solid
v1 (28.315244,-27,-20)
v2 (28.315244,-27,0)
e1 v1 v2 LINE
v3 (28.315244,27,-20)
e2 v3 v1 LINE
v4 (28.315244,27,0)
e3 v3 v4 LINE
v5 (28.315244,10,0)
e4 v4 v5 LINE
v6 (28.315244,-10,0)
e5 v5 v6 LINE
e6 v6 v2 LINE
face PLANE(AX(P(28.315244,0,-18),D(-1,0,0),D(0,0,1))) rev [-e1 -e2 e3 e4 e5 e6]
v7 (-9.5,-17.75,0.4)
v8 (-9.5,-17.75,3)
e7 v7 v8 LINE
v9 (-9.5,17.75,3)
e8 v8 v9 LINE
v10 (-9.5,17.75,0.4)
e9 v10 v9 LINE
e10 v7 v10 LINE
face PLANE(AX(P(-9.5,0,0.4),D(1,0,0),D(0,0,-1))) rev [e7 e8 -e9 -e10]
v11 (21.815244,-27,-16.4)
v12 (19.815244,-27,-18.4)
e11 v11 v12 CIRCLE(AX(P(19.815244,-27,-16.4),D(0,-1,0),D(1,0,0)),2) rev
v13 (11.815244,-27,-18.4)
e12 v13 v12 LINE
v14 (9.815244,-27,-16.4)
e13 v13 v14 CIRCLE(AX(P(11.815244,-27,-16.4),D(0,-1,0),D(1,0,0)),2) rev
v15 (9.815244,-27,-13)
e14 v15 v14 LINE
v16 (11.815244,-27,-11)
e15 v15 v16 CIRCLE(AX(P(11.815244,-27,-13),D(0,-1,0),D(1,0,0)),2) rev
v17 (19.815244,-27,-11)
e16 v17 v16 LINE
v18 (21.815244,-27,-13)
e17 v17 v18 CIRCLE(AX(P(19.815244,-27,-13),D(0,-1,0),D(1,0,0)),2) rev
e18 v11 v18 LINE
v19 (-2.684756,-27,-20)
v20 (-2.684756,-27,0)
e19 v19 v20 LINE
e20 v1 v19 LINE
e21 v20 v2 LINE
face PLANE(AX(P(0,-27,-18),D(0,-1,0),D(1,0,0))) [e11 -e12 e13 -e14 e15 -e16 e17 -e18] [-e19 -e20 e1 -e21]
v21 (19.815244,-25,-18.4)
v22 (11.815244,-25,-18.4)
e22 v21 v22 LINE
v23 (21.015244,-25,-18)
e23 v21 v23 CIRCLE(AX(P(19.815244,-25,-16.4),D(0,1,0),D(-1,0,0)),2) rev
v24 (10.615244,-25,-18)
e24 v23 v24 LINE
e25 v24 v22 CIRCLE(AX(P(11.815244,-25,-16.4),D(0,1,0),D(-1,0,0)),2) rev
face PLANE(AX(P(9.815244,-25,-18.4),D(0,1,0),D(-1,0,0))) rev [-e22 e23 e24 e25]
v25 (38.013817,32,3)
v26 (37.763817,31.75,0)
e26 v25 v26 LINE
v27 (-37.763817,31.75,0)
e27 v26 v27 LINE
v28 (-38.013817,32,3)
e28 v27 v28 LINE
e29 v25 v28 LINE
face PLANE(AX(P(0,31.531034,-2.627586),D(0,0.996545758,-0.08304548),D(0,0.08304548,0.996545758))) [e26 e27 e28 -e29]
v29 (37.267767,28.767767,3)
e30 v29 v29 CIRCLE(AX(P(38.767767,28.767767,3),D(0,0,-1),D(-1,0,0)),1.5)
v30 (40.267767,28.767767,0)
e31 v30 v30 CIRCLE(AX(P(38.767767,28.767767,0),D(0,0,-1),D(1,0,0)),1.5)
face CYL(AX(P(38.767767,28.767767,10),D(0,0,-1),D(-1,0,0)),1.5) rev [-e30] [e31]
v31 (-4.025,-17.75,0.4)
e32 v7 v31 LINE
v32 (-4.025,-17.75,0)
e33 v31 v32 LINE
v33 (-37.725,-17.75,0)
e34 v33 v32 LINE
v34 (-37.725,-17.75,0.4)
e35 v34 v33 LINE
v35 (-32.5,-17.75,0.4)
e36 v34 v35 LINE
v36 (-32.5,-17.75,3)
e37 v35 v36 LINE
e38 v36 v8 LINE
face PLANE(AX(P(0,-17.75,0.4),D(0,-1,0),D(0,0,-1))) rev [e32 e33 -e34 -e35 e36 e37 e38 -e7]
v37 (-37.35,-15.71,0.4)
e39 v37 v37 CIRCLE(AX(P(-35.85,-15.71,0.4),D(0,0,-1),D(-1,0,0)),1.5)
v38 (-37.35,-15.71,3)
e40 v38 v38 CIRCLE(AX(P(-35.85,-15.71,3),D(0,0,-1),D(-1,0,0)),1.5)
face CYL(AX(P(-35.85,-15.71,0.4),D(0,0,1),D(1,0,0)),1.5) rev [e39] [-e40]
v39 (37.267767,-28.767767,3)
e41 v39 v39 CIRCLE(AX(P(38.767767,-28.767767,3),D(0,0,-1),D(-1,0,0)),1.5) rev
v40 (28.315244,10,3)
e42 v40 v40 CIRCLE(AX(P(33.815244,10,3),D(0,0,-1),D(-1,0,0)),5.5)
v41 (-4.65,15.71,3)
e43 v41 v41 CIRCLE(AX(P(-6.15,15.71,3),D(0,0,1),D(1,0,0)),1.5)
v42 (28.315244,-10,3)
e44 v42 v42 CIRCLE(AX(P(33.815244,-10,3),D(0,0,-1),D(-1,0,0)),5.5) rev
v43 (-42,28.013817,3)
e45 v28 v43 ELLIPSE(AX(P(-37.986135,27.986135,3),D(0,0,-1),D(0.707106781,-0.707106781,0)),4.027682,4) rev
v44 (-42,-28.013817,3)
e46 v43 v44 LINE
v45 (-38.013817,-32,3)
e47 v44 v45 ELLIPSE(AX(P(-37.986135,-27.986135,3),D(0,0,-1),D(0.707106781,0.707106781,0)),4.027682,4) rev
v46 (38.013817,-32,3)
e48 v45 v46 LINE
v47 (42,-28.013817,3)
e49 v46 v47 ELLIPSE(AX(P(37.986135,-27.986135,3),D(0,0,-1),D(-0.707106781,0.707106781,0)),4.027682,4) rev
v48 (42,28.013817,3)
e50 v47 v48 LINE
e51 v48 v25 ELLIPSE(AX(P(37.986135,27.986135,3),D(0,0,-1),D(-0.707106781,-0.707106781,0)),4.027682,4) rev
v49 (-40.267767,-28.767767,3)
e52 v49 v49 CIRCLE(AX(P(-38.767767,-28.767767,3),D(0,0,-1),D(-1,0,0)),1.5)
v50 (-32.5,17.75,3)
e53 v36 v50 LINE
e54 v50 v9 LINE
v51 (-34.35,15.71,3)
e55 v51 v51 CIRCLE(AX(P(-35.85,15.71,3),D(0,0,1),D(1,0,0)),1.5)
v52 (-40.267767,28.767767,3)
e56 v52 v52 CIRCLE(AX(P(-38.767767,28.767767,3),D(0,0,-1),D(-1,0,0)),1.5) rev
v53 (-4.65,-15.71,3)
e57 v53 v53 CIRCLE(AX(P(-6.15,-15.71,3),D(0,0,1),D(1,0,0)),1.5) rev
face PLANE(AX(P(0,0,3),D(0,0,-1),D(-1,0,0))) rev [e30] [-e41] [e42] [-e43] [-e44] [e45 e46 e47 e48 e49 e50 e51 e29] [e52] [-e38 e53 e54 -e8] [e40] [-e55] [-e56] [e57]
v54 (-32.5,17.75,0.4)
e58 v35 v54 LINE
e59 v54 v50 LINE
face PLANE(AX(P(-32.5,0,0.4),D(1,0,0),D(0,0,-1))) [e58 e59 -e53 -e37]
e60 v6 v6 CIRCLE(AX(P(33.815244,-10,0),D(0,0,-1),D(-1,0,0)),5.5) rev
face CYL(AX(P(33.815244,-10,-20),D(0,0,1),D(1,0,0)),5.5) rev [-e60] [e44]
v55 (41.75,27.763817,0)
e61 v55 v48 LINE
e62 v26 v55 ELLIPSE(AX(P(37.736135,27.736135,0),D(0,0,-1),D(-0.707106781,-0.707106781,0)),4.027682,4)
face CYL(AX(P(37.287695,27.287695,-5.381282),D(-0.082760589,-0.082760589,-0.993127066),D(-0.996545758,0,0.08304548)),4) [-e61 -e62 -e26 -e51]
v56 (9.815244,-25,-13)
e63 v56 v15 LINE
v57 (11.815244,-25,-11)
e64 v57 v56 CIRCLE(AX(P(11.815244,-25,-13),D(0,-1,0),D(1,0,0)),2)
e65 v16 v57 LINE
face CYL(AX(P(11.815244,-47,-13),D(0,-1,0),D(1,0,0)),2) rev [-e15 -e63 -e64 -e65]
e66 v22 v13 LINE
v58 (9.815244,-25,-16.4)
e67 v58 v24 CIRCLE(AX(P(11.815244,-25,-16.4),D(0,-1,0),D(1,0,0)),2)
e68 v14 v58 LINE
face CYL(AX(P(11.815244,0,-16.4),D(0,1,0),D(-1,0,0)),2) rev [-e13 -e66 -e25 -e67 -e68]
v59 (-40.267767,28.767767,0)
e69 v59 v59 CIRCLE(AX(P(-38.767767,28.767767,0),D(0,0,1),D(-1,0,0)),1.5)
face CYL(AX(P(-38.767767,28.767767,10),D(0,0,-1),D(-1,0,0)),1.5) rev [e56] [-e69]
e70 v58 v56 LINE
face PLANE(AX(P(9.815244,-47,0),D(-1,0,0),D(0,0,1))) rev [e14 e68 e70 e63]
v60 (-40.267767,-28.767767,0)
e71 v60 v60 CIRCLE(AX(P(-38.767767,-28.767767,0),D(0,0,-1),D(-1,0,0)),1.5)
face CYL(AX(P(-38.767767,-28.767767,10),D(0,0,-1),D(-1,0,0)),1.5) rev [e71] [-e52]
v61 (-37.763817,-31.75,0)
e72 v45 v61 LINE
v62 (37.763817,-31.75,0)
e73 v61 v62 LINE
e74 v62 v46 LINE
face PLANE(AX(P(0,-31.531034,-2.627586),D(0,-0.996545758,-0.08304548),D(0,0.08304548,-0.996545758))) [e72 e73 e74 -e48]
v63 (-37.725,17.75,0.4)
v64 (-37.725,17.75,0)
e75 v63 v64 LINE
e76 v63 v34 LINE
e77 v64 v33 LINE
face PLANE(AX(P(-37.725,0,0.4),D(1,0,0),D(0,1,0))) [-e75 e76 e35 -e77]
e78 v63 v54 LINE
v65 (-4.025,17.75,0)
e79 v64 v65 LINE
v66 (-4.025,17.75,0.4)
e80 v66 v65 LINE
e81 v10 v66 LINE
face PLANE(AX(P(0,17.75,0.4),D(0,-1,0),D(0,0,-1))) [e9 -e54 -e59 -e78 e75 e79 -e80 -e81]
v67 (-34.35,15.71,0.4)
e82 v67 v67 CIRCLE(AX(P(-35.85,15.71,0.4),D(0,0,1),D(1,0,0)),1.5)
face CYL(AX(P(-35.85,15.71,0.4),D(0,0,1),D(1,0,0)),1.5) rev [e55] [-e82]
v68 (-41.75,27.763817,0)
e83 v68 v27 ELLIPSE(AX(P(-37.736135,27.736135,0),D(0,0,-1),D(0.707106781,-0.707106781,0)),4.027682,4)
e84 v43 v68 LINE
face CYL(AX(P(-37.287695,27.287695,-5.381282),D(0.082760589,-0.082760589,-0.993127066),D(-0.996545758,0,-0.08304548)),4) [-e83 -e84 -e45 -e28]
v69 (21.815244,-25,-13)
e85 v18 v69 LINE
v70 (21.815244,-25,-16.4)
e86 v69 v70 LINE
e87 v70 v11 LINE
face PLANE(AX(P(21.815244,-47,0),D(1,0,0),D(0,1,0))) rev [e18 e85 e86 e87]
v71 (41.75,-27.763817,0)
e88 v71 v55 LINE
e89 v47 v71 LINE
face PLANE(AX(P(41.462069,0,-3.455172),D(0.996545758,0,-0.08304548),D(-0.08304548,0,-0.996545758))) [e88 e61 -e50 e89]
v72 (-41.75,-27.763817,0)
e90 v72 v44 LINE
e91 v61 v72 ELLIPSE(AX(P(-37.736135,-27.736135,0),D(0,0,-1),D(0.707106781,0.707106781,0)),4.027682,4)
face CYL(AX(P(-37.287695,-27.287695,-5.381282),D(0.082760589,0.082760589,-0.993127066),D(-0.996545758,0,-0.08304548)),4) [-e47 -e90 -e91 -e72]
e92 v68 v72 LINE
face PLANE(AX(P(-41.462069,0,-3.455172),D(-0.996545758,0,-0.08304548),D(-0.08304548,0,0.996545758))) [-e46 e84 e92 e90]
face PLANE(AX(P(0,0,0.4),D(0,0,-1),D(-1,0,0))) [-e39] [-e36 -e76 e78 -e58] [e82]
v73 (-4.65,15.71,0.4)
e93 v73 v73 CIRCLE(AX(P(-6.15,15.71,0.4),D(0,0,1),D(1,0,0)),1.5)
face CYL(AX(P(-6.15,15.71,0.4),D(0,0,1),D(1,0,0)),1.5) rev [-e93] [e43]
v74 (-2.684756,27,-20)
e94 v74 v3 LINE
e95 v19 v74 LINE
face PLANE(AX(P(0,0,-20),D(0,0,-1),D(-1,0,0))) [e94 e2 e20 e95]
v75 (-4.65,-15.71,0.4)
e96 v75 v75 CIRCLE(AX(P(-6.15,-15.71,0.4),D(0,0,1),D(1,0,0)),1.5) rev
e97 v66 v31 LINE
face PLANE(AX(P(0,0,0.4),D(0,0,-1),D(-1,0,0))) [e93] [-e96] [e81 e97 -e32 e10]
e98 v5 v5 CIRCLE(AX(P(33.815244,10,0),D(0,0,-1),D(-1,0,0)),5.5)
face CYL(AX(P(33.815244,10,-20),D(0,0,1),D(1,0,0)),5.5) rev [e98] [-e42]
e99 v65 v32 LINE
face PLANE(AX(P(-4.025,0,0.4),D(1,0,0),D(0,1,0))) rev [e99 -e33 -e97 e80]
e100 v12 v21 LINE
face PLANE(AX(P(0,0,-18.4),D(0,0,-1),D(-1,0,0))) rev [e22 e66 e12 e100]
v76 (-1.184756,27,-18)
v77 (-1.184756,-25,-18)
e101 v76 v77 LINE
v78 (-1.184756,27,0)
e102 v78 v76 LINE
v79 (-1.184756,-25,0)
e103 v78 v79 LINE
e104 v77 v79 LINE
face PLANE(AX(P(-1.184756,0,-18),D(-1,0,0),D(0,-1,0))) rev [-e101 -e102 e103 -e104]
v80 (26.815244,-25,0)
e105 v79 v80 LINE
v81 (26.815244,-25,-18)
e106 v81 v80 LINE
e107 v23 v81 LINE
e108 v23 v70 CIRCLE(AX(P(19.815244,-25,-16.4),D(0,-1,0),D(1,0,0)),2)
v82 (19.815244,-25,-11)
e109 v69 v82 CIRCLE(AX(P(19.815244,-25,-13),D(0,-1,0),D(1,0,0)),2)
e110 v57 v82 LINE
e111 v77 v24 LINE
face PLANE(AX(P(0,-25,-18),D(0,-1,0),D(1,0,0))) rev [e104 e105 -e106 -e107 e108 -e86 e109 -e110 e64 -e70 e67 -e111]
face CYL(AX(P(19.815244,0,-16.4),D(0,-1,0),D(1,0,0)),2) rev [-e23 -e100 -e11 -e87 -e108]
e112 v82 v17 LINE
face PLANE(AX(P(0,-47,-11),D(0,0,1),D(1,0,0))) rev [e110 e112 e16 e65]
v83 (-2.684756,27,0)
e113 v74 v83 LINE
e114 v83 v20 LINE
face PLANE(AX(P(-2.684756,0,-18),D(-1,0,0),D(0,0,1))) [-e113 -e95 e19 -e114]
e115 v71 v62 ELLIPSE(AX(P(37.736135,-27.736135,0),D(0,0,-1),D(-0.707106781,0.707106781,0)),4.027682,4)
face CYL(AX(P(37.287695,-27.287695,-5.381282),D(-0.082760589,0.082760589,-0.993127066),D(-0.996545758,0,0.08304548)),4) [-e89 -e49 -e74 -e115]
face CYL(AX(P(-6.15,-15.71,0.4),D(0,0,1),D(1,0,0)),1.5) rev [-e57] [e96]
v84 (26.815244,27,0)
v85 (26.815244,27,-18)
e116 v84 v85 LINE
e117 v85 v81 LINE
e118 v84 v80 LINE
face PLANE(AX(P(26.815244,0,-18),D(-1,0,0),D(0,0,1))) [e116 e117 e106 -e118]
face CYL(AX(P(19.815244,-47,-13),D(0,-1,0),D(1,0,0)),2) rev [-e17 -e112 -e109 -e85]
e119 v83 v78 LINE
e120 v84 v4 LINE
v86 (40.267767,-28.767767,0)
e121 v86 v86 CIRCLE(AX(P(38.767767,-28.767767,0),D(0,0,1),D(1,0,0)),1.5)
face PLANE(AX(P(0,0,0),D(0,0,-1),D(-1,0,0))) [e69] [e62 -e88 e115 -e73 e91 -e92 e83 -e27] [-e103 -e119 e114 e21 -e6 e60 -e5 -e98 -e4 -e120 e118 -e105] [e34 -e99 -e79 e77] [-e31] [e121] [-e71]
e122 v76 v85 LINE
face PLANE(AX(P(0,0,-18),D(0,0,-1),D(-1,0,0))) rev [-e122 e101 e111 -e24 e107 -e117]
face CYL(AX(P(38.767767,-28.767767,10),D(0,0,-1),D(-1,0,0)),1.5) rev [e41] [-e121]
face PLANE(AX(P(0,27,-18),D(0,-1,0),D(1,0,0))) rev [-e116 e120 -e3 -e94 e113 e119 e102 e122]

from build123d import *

# Parameters (mm, degrees)
SKETCH3_R               = 1.5
CUT_EXTRUDE1_DEPTH      = 10
MIRROR2_COPY_1_SKETCH_R = 1.5
MIRROR2_COPY_1_DEPTH    = 10
FILLET1_R               = 4
SKETCH4_W               = 23
SKETCH4_H               = 17.75
SKETCH4_R               = 1.5
CUT_EXTRUDE2_DEPTH      = 2.6
SKETCH5_W               = 33.7
SKETCH5_H               = 17.75
CUT_EXTRUDE3_DEPTH      = 0.4
BOSS_EXTRUDE1_DEPTH     = 18
SKETCH7_W               = 31
SKETCH7_H               = 54
BOSS_EXTRUDE2_DEPTH     = 2
SKETCH8_W               = 14
SKETCH8_H               = 18
CUT_EXTRUDE4_DEPTH      = 12
CUT_EXTRUDE6_START      = -12
SKETCH9_R               = 5.5
CUT_EXTRUDE6_DEPTH      = 69.462376985
CUT_EXTRUDE8_DEPTH      = 22
SKETCH11_W              = 12
SKETCH11_H              = 2
CUT_EXTRUDE9_DEPTH      = 0.4
FILLET2_R               = 2


with BuildPart() as part:
    # Sketch2 → Loft1 section 0
    with BuildSketch(Plane.XY.offset(3)):
        with BuildLine():
            Line((-42, -32), (42, -32))
            Line((42, -32), (42, 32))
            Line((42, 32), (-42, 32))
            Line((-42, 32), (-42, -32))
        make_face()
    # Sketch1 → Loft1 section 1
    with BuildSketch(Plane.XY):
        with BuildLine():
            Line((-41.75, -31.75), (41.75, -31.75))
            Line((41.75, -31.75), (41.75, 31.75))
            Line((41.75, 31.75), (-41.75, 31.75))
            Line((-41.75, 31.75), (-41.75, -31.75))
        make_face()
    loft()

    # Sketch3 → Cut-Extrude1 (cut)
    with BuildSketch(Plane(origin=(0, 0, 0), x_dir=(-1, 0, 0), z_dir=(0, 0, -1))):
        with Locations((38.767766953, -28.767766953)):
            Circle(SKETCH3_R)
    cut_extrude1 = extrude(amount=-CUT_EXTRUDE1_DEPTH, mode=Mode.SUBTRACT)

    # Mirror1: Cut-Extrude1 across plane
    add(cut_extrude1.mirror(Plane(origin=(0, 0, 0), x_dir=(0, 0, 1), z_dir=(1, 0, 0))), mode=Mode.SUBTRACT)

    # Mirror2: Cut-Extrude1 across plane
    add(cut_extrude1.mirror(Plane.ZX), mode=Mode.SUBTRACT)

    # Mirror2 copy 1 sketch → Mirror2 copy 1 (cut)
    with BuildSketch(Plane(origin=(0, 0, 0), x_dir=(1, 0, 0), z_dir=(0, 0, -1))):
        with Locations((38.767766953, -28.767766953)):
            Circle(MIRROR2_COPY_1_SKETCH_R)
    extrude(amount=-MIRROR2_COPY_1_DEPTH, mode=Mode.SUBTRACT)

    # Fillet1
    fillet1_edges = [part.edges().sort_by_distance(p)[0] for p in [
        (-41.875, 31.875, 1.5),
        (41.875, 31.875, 1.5),
        (41.875, -31.875, 1.5),
        (-41.875, -31.875, 1.5),
    ]]
    fillet(fillet1_edges, radius=FILLET1_R)

    # Sketch4 → Cut-Extrude2 (cut)
    with BuildSketch(Plane.XY.offset(3)):
        with Locations((-21, 8.875)):
            Rectangle(SKETCH4_W, SKETCH4_H)
        with Locations((-21, -8.875)):
            Rectangle(SKETCH4_W, SKETCH4_H)
        with Locations((-35.85, 15.71)):
            Circle(SKETCH4_R)
        with Locations((-6.15, -15.71)):
            Circle(SKETCH4_R)
        with Locations((-6.15, 15.71)):
            Circle(SKETCH4_R)
        with Locations(Location((-35.85, -15.71, 0), (0, 0, 180))):
            Circle(SKETCH4_R)
    extrude(amount=-CUT_EXTRUDE2_DEPTH, mode=Mode.SUBTRACT)

    # Sketch5 → Cut-Extrude3 (cut)
    with BuildSketch(Plane(origin=(0, 0, 0), x_dir=(-1, 0, 0), z_dir=(0, 0, -1))):
        with Locations((20.875, -8.875)):
            Rectangle(SKETCH5_W, SKETCH5_H)
        with Locations((20.875, 8.875)):
            Rectangle(SKETCH5_W, SKETCH5_H)
    extrude(amount=-CUT_EXTRUDE3_DEPTH, mode=Mode.SUBTRACT)

    # Sketch6 → Boss-Extrude1 (add)
    with BuildSketch(Plane(origin=(0, 0, 0), x_dir=(-1, 0, 0), z_dir=(0, 0, -1))):
        Polygon((2.684756285, -27), (2.684756285, 0), (1.184756285, 0), (1.184756285, -25), (-26.815243715, -25), (-26.815243715, 0), (-28.315243715, 0), (-28.315243715, -27), align=None)
        Polygon((2.684756285, 0), (2.684756285, 27), (-28.315243715, 27), (-28.315243715, 0), (-26.815243715, 0), (-26.815243715, 25), (1.184756285, 25), (1.184756285, 0), align=None)
    extrude(amount=BOSS_EXTRUDE1_DEPTH)

    # Sketch7 → Boss-Extrude2 (add)
    with BuildSketch(Plane(origin=(0, 0, -18), x_dir=(-1, 0, 0), z_dir=(0, 0, -1))):
        with Locations((-12.815243715, 0)):
            Rectangle(SKETCH7_W, SKETCH7_H)
    extrude(amount=BOSS_EXTRUDE2_DEPTH)

    # Sketch8 → Cut-Extrude4 (cut)
    with BuildSketch(Plane(origin=(0, 27, 0), x_dir=(1, 0, 0), z_dir=(0, 1, 0))):
        with Locations((5.815243715, 9)):
            Rectangle(SKETCH8_W, SKETCH8_H)
        with Locations((19.815243715, 9)):
            Rectangle(SKETCH8_W, SKETCH8_H)
    extrude(amount=-CUT_EXTRUDE4_DEPTH, mode=Mode.SUBTRACT)

    # Sketch9 → Cut-Extrude6 (cut)
    with BuildSketch(Plane(origin=(0, 0, 0), x_dir=(-1, 0, 0), z_dir=(0, 0, -1)).offset(CUT_EXTRUDE6_START)):
        with Locations((-33.815243715, -10)):
            Circle(SKETCH9_R)
    cut_extrude6 = extrude(amount=CUT_EXTRUDE6_DEPTH, mode=Mode.SUBTRACT)

    # Mirror3: Cut-Extrude6 across plane
    add(cut_extrude6.mirror(Plane.ZX), mode=Mode.SUBTRACT)

    # Sketch10 → Cut-Extrude8 (cut)
    with BuildSketch(Plane(origin=(0, -25, 0), x_dir=(1, 0, 0), z_dir=(0, 1, 0))):
        Polygon((15.815243715, 18), (21.815243715, 18), (21.815243715, 11), (9.815243715, 11), (9.815243715, 18), align=None)
    extrude(amount=-CUT_EXTRUDE8_DEPTH, mode=Mode.SUBTRACT)

    # Sketch11 → Cut-Extrude9 (cut)
    with BuildSketch(Plane.XY.offset(-18)):
        with Locations((15.815243715, -26)):
            Rectangle(SKETCH11_W, SKETCH11_H)
    extrude(amount=-CUT_EXTRUDE9_DEPTH, mode=Mode.SUBTRACT)

    # Fillet2
    # the kernel refuses this fillet: 2 mm, written as the material it adds along each edge
    with BuildSketch(Plane(origin=(21.815243715, -25, -11), x_dir=(0, 0, -1), z_dir=(0, -1, 0)), Plane(origin=(9.815243715, -27, -18.4), x_dir=(1, 0, 0), z_dir=(0, 1, 0))) as fillet2_piece_1:
        with BuildLine():
            CenterArc((FILLET2_R, -FILLET2_R), FILLET2_R, 90, 90)
            Line((0, -FILLET2_R), (0, 0))
            Line((0, 0), (FILLET2_R, 0))
        make_face()
    extrude(amount=2)
    with BuildSketch(Plane(origin=(9.815243715, -25, -11), x_dir=(0, 0, -1), z_dir=(0, -1, 0)), Plane(origin=(21.815243715, -25, -18.4), x_dir=(0, 0, 1), z_dir=(0, -1, 0))) as fillet2_piece_2:
        with BuildLine():
            CenterArc((FILLET2_R, FILLET2_R), FILLET2_R, 180, 90)
            Line((0, FILLET2_R), (0, 0))
            Line((0, 0), (FILLET2_R, 0))
        make_face()
    extrude(amount=2)


solid = part.part
